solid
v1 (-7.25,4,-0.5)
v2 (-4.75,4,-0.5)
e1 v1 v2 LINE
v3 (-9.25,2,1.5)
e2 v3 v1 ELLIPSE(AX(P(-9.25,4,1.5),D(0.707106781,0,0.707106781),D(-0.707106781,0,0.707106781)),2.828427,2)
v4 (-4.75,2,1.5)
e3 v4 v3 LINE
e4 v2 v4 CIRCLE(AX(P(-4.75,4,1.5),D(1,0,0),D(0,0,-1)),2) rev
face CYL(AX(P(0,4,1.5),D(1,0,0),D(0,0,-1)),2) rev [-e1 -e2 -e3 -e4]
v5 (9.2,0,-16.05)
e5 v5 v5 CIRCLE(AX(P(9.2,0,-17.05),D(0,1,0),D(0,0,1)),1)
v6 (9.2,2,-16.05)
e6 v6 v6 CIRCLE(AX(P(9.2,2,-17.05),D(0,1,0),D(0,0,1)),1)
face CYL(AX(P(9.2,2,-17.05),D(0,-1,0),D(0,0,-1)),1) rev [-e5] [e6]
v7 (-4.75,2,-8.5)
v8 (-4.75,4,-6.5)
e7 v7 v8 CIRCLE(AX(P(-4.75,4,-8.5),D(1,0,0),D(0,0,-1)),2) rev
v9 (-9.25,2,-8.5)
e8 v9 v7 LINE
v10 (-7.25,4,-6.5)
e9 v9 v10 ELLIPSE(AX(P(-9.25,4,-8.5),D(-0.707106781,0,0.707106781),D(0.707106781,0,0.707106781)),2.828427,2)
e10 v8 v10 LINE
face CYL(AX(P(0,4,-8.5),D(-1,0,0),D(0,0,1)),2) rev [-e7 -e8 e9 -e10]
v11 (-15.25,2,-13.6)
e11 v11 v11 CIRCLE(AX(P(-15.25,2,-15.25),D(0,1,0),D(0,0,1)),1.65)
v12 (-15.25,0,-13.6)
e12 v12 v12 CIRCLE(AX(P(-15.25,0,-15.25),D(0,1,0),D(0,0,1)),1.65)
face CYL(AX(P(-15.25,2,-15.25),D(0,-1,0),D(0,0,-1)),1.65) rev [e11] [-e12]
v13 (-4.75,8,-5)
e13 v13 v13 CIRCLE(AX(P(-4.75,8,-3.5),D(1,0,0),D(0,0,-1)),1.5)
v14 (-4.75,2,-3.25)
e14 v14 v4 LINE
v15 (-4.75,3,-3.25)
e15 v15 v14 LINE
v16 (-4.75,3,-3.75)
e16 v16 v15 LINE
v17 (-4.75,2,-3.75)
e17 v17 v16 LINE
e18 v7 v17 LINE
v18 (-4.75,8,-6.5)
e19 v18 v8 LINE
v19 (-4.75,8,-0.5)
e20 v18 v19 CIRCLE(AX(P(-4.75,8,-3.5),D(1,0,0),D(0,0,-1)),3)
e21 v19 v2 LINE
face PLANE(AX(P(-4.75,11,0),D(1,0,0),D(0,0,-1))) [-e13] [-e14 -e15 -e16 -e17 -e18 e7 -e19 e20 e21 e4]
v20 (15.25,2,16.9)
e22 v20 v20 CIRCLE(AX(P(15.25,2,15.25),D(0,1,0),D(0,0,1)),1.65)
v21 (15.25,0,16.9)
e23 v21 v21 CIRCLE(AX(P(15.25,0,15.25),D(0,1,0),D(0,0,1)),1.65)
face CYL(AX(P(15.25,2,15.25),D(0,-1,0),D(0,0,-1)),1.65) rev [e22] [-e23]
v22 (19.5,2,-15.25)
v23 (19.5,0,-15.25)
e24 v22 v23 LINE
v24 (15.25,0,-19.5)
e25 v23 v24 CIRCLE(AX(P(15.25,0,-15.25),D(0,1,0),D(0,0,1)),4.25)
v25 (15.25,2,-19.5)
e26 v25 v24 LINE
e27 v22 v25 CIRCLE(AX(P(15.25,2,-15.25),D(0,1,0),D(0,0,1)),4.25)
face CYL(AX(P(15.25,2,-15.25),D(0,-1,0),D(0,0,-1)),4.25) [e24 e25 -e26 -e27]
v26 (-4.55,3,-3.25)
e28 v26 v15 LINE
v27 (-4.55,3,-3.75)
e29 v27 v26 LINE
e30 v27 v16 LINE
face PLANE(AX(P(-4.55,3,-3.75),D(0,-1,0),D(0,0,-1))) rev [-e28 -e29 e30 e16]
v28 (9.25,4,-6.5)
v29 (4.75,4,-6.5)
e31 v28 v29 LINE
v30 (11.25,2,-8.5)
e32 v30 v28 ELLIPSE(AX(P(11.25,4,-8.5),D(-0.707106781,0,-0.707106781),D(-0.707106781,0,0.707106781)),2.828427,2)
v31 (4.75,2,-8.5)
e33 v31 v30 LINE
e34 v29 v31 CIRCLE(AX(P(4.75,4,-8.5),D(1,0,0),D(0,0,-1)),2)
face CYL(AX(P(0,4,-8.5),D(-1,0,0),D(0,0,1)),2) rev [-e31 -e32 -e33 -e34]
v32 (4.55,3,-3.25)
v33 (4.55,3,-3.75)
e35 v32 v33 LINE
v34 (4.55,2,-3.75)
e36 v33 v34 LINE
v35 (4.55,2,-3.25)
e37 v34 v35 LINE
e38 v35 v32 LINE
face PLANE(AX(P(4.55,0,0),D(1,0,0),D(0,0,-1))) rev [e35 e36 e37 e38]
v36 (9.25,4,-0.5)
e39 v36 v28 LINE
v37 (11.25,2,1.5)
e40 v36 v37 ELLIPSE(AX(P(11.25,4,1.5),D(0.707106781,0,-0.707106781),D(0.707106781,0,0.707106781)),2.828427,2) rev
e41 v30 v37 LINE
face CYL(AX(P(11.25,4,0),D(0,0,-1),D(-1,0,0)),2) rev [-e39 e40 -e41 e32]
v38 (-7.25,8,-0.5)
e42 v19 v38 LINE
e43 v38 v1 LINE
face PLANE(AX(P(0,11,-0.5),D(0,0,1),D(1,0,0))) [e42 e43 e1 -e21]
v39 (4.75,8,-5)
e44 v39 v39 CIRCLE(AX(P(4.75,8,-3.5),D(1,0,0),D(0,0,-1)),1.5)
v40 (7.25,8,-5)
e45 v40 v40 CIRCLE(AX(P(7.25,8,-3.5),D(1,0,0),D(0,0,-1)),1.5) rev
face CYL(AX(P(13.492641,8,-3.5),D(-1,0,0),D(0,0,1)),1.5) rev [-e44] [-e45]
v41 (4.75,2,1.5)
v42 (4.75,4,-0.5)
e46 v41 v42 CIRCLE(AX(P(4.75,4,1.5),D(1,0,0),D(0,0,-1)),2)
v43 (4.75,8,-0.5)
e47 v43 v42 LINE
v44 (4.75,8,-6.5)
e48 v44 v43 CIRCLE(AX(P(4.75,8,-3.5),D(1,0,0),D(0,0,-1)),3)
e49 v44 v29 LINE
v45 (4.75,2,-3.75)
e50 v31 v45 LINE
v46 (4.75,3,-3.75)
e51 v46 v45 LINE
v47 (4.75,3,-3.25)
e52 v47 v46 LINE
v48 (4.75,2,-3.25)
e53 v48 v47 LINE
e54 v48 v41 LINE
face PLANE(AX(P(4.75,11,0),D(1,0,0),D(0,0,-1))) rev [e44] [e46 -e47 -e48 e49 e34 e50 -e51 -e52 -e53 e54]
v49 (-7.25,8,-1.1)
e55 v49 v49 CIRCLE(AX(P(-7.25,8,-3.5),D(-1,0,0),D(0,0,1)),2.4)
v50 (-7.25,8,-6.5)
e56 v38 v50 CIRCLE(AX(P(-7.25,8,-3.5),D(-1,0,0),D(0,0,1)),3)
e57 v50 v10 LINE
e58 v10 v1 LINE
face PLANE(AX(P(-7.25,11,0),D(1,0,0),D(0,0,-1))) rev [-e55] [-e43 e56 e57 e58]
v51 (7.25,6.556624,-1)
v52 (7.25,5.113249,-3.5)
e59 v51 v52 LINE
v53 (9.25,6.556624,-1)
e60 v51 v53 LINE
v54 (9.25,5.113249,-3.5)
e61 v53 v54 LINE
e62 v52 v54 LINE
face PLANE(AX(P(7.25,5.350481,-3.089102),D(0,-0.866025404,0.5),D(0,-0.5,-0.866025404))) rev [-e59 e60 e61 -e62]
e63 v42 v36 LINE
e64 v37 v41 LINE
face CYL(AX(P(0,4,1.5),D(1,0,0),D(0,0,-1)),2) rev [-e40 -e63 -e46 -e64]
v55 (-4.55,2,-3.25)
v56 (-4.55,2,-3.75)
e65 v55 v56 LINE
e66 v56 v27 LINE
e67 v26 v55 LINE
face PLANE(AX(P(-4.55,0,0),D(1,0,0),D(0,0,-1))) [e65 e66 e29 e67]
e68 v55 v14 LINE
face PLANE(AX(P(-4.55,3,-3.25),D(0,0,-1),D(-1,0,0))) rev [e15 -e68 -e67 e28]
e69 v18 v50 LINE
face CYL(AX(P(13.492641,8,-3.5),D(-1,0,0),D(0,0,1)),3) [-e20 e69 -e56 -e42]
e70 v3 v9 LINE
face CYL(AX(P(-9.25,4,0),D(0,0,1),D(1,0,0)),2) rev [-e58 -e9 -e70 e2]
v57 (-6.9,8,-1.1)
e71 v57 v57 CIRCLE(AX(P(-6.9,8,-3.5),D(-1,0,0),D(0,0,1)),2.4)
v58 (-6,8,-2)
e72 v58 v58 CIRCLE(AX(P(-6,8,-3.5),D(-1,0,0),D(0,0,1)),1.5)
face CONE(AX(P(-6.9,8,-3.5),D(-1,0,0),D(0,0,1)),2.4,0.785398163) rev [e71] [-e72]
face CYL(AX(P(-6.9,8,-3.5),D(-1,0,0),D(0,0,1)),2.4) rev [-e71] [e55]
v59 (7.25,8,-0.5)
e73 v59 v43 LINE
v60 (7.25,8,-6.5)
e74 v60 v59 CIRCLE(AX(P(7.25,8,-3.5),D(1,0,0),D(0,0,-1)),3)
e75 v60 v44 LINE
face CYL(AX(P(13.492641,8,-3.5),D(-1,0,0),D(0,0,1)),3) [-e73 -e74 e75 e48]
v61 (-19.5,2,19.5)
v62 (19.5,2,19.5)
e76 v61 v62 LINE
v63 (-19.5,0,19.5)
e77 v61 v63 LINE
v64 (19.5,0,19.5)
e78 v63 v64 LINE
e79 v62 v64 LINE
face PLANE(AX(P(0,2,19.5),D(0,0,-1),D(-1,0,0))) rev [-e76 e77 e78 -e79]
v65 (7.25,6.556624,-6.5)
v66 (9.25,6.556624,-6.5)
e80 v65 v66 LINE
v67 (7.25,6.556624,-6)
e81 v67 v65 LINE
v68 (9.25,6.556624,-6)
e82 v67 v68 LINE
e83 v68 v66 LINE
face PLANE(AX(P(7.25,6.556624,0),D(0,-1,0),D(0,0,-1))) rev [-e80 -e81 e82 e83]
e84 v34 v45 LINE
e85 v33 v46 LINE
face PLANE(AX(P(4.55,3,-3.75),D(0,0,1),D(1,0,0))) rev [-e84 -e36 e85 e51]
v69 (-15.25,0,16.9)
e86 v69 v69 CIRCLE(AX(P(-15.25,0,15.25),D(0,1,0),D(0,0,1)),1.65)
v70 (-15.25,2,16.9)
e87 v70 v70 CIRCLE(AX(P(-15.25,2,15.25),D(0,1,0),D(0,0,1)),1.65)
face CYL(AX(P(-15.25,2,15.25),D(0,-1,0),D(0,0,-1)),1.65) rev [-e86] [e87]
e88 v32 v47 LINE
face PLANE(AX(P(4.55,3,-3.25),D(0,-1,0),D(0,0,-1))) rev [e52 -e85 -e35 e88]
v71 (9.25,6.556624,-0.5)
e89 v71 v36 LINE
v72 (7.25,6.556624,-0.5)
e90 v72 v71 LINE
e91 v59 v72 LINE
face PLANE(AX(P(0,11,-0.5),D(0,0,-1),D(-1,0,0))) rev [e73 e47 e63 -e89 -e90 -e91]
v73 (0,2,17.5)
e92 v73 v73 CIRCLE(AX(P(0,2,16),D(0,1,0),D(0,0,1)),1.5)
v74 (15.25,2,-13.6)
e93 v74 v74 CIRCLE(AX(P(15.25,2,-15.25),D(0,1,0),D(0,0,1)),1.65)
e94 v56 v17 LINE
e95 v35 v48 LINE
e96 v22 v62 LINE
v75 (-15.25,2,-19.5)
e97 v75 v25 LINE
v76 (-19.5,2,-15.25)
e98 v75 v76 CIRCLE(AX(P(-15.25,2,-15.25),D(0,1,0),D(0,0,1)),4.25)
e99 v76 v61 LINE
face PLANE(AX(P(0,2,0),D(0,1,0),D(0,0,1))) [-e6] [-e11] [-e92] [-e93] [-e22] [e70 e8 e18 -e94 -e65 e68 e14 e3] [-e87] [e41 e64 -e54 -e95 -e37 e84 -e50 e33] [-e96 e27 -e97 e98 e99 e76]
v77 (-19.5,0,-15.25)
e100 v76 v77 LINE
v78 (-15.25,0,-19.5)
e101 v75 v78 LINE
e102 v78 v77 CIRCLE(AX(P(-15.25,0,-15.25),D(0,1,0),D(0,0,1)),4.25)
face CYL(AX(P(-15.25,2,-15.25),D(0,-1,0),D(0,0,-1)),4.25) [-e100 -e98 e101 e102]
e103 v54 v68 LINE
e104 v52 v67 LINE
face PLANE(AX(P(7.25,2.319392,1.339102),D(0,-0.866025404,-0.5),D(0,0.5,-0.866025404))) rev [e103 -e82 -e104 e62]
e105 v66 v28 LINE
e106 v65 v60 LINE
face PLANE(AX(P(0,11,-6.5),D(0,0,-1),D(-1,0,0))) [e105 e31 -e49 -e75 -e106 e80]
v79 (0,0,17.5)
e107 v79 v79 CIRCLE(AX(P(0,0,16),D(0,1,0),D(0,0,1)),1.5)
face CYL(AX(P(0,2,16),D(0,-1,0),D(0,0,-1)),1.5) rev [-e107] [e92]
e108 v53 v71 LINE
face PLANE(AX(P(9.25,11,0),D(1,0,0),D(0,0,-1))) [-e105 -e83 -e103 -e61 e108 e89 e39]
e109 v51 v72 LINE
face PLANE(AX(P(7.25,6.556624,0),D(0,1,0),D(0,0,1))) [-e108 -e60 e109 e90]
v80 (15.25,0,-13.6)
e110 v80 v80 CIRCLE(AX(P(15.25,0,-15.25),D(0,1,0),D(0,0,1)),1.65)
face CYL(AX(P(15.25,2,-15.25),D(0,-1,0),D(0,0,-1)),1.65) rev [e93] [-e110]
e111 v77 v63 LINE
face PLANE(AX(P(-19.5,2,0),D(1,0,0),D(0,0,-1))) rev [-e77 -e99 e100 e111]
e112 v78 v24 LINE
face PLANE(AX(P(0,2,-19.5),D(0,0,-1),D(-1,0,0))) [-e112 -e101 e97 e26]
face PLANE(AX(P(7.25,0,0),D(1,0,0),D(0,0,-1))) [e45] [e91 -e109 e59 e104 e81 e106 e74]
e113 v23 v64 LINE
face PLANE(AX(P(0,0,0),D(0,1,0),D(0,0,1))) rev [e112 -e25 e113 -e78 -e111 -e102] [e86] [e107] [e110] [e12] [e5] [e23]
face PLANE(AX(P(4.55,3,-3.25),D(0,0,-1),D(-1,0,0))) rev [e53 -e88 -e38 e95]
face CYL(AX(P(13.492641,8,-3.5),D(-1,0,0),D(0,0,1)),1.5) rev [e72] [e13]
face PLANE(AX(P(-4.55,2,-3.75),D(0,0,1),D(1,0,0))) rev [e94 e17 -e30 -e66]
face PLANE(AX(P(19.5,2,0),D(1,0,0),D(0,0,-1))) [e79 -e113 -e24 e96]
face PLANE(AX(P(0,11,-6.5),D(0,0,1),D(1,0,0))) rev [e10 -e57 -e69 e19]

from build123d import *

# Parameters (mm, degrees)
SKETCH1_R          = 1.5
SKETCH1_R_2        = 1
SKETCH1_R_3        = 1.65
SHAPE_DEPTH        = 2
SKETCH3_W          = 2.5
SKETCH3_H          = 6
SKETCH3_W_2        = 2
SUPPORTS_DEPTH     = 9
SUPPORT_CUTS_REACH = 36.883
FILLET1_R          = 2
NUT_START          = -2
SKETCH5_R          = 1.5
NUT_HOLDER_DEPTH   = 2
SKETCH6_R          = 2.4
SCREW_CUT_DEPTH    = 0.35
SCEW_CHAMFER_SIZE  = 0.9
SKETCH7_W          = 0.5
SKETCH7_H          = 1
ANGLE_FIX_1_DEPTH  = 0.2
SKETCH8_W          = 0.5
SKETCH8_H          = 1
ANGLE_FIX_2_DEPTH  = 0.2


with BuildPart() as part:
    # Sketch1 → Shape (new body)
    with BuildSketch(Plane(origin=(0, 0, 0), x_dir=(1, 0, 0), z_dir=(0, 1, 0))):
        with BuildLine():
            Line((15.25000005, 19.5), (-15.25, 19.5))
            ThreePointArc((-15.25, 19.5), (-18.25520382, 18.25520382), (-19.5, 15.25))
            Line((-19.5, 15.25), (-19.5, -19.5))
            Line((-19.5, -19.5), (19.5, -19.5))
            Line((19.5, -19.5), (19.5, 15.25))
            ThreePointArc((19.5, 15.25), (18.255203838, 18.255203802), (15.25000005, 19.5))
        make_face()
        with Locations(Location((0, -16, 0), (0, 0, 270))):
            Circle(SKETCH1_R, mode=Mode.SUBTRACT)
        with Locations(Location((9.2, 17.05, 0), (0, 0, 270))):
            Circle(SKETCH1_R_2, mode=Mode.SUBTRACT)
        with Locations(Location((-15.25, 15.25, 0), (0, 0, 270))):
            Circle(SKETCH1_R_3, mode=Mode.SUBTRACT)
        with Locations(Location((15.25, 15.25, 0), (0, 0, 270))):
            Circle(SKETCH1_R_3, mode=Mode.SUBTRACT)
        with Locations(Location((-15.25, -15.25, 0), (0, 0, 270))):
            Circle(SKETCH1_R_3, mode=Mode.SUBTRACT)
        with Locations(Location((15.25, -15.25, 0), (0, 0, 270))):
            Circle(SKETCH1_R_3, mode=Mode.SUBTRACT)
    extrude(amount=SHAPE_DEPTH)

    # Sketch3 → Supports (add)
    with BuildSketch(Plane(origin=(0, 2, 0), x_dir=(1, 0, 0), z_dir=(0, 1, 0))):
        with Locations((-6, 3.5)):
            Rectangle(SKETCH3_W, SKETCH3_H)
        with Locations((6, 3.5)):
            Rectangle(SKETCH3_W, SKETCH3_H)
        with Locations((8.25, 3.5)):
            Rectangle(SKETCH3_W_2, SKETCH3_H)
    extrude(amount=SUPPORTS_DEPTH)

    # Support cuts: up to this face of the body (flat: up to its plane)
    support_cuts_end = Plane(part.part.faces().sort_by_distance((9.25, 6.5, -3.5))[0])
    # Sketch4 → Support cuts (cut, up to the picked face)
    with BuildSketch(Plane.ZY.offset(7.25), mode=Mode.PRIVATE) as support_cuts_sk1:
        with BuildLine():
            ThreePointArc((-2, 8), (-2.439339828, 9.060660172), (-3.5, 9.5))
            Line((-3.5, 9.5), (-3.5, 6.5))
            ThreePointArc((-3.5, 6.5), (-2.439339828, 6.939339828), (-2, 8))
        make_face()
    support_cuts_tool1 = split(extrude(support_cuts_sk1.sketch, amount=-SUPPORT_CUTS_REACH, mode=Mode.PRIVATE), bisect_by=support_cuts_end, keep=Keep.BOTH, mode=Mode.PRIVATE)
    # Sketch4 → Support cuts (cut, up to the picked face)
    with BuildSketch(Plane.ZY.offset(7.25), mode=Mode.PRIVATE) as support_cuts_sk2:
        with BuildLine():
            Line((-3.5, 6.5), (-3.5, 9.5))
            ThreePointArc((-3.5, 9.5), (-5, 8), (-3.5, 6.5))
        make_face()
    support_cuts_tool2 = split(extrude(support_cuts_sk2.sketch, amount=-SUPPORT_CUTS_REACH, mode=Mode.PRIVATE), bisect_by=support_cuts_end, keep=Keep.BOTH, mode=Mode.PRIVATE)
    # Sketch4 → Support cuts (cut, up to the picked face)
    with BuildSketch(Plane.ZY.offset(7.25), mode=Mode.PRIVATE) as support_cuts_sk3:
        with BuildLine():
            ThreePointArc((-2, 8), (-2.439339828, 9.060660172), (-3.5, 9.5))
            Line((-3.5, 9.5), (-3.5, 6.5))
            ThreePointArc((-3.5, 6.5), (-2.439339828, 6.939339828), (-2, 8))
        make_face()
    support_cuts_tool3 = split(extrude(support_cuts_sk3.sketch, amount=-SUPPORT_CUTS_REACH, mode=Mode.PRIVATE), bisect_by=support_cuts_end, keep=Keep.BOTH, mode=Mode.PRIVATE)
    # Sketch4 → Support cuts (cut, up to the picked face)
    with BuildSketch(Plane.ZY.offset(7.25), mode=Mode.PRIVATE) as support_cuts_sk4:
        with BuildLine():
            Line((-3.5, 6.5), (-3.5, 9.5))
            ThreePointArc((-3.5, 9.5), (-5, 8), (-3.5, 6.5))
        make_face()
    support_cuts_tool4 = split(extrude(support_cuts_sk4.sketch, amount=-SUPPORT_CUTS_REACH, mode=Mode.PRIVATE), bisect_by=support_cuts_end, keep=Keep.BOTH, mode=Mode.PRIVATE)
    # Sketch4 → Support cuts (cut, up to the picked face)
    with BuildSketch(Plane.ZY.offset(7.25), mode=Mode.PRIVATE) as support_cuts_sk5:
        with BuildLine():
            ThreePointArc((-6.5, 7.999999991), (-5.621320347, 10.12132034), (-3.5, 11))
            Line((-3.5, 11), (-6.5, 11))
            Line((-6.5, 11), (-6.5, 7.999999991))
        make_face()
    support_cuts_tool5 = split(extrude(support_cuts_sk5.sketch, amount=-SUPPORT_CUTS_REACH, mode=Mode.PRIVATE), bisect_by=support_cuts_end, keep=Keep.BOTH, mode=Mode.PRIVATE)
    # Sketch4 → Support cuts (cut, up to the picked face)
    with BuildSketch(Plane.ZY.offset(7.25), mode=Mode.PRIVATE) as support_cuts_sk6:
        with BuildLine():
            Line((-0.5, 11), (-3.5, 11))
            ThreePointArc((-3.5, 11), (-1.378679656, 10.121320344), (-0.5, 8))
            Line((-0.5, 8), (-0.5, 11))
        make_face()
    support_cuts_tool6 = split(extrude(support_cuts_sk6.sketch, amount=-SUPPORT_CUTS_REACH, mode=Mode.PRIVATE), bisect_by=support_cuts_end, keep=Keep.BOTH, mode=Mode.PRIVATE)
    add(support_cuts_tool1.solids().sort_by(Axis((-7.25, 8, -2.86338), (1, 0, 0)))[0], mode=Mode.SUBTRACT)
    add(support_cuts_tool2.solids().sort_by(Axis((-7.25, 8, -4.13662), (1, 0, 0)))[0], mode=Mode.SUBTRACT)
    add(support_cuts_tool3.solids().sort_by(Axis((-7.25, 8, -2.86338), (1, 0, 0)))[0], mode=Mode.SUBTRACT)
    add(support_cuts_tool4.solids().sort_by(Axis((-7.25, 8, -4.13662), (1, 0, 0)))[0], mode=Mode.SUBTRACT)
    add(support_cuts_tool5.solids().sort_by(Axis((-7.25, 10.329896, -5.829896), (1, 0, 0)))[0], mode=Mode.SUBTRACT)
    add(support_cuts_tool6.solids().sort_by(Axis((-7.25, 10.329896, -1.170104), (1, 0, 0)))[0], mode=Mode.SUBTRACT)

    # Fillet1
    fillet1_edges = [part.edges().sort_by_distance(p)[0] for p in [
        (-6, 2, -6.5),
        (-7.25, 2, -3.5),
        (-6, 2, -0.5),
        (7, 2, -0.5),
        (7, 2, -6.5),
        (9.25, 2, -3.5),
    ]]
    fillet(fillet1_edges, radius=FILLET1_R)

    # Sketch5 → Nut holder (cut)
    # profile 1 of 2: a face of its own
    with BuildSketch(Plane(origin=(9.25, 0, 0), x_dir=(0, 0, -1), z_dir=(1, 0, 0)).offset(NUT_START)):
        Polygon((1, 9.443375673), (1, 6.556624327), (3.5, 5.113248654), (6, 6.556624327), (6, 9.443375673), (3.5, 10.886751346), align=None)
        with Locations((3.5, 8)):
            Circle(SKETCH5_R, mode=Mode.SUBTRACT)
    # profile 2 of 2: a face of its own
    with BuildSketch(Plane(origin=(9.25, 0, 0), x_dir=(0, 0, -1), z_dir=(1, 0, 0)).offset(NUT_START)):
        with BuildLine():
            Line((0.5, 6.556624327), (1, 6.556624327))
            Line((1, 6.556624327), (1, 9.443375673))
            Line((1, 9.443375673), (3.5, 10.886751346))
            Line((3.5, 10.886751346), (6, 9.443375673))
            Line((6, 9.443375673), (6, 6.556624327))
            Line((6, 6.556624327), (6.5, 6.556624327))
            Line((6.5, 6.556624327), (6.5, 8))
            ThreePointArc((6.5, 8), (3.5, 11), (0.5, 8))
            Line((0.5, 8), (0.5, 6.556624327))
        make_face()
    extrude(amount=NUT_HOLDER_DEPTH, mode=Mode.SUBTRACT)

    # Sketch6 → Screw cut (cut)
    with BuildSketch(Plane.ZY.offset(7.25)):
        with Locations((-3.5, 8)):
            Circle(SKETCH6_R)
    extrude(amount=-SCREW_CUT_DEPTH, mode=Mode.SUBTRACT)

    # Scew chamfer
    scew_chamfer_edges = [part.edges().sort_by_distance(p)[0] for p in [
        (-6.9, 6.5, -3.5),
    ]]
    chamfer(scew_chamfer_edges, length=SCEW_CHAMFER_SIZE - 0.0001)  # a hair under: the kernel refuses the full size

    # Sketch7 → Angle fix 1 (add)
    with BuildSketch(Plane.ZY.offset(-4.75)):
        with Locations((-3.5, 2.5)):
            Rectangle(SKETCH7_W, SKETCH7_H)
    extrude(amount=ANGLE_FIX_1_DEPTH)

    # Sketch8 → Angle fix 2 (add)
    with BuildSketch(Plane(origin=(-4.75, 0, 0), x_dir=(0, 0, -1), z_dir=(1, 0, 0))):
        with Locations((3.5, 2.5)):
            Rectangle(SKETCH8_W, SKETCH8_H)
    extrude(amount=ANGLE_FIX_2_DEPTH)


solid = part.part
